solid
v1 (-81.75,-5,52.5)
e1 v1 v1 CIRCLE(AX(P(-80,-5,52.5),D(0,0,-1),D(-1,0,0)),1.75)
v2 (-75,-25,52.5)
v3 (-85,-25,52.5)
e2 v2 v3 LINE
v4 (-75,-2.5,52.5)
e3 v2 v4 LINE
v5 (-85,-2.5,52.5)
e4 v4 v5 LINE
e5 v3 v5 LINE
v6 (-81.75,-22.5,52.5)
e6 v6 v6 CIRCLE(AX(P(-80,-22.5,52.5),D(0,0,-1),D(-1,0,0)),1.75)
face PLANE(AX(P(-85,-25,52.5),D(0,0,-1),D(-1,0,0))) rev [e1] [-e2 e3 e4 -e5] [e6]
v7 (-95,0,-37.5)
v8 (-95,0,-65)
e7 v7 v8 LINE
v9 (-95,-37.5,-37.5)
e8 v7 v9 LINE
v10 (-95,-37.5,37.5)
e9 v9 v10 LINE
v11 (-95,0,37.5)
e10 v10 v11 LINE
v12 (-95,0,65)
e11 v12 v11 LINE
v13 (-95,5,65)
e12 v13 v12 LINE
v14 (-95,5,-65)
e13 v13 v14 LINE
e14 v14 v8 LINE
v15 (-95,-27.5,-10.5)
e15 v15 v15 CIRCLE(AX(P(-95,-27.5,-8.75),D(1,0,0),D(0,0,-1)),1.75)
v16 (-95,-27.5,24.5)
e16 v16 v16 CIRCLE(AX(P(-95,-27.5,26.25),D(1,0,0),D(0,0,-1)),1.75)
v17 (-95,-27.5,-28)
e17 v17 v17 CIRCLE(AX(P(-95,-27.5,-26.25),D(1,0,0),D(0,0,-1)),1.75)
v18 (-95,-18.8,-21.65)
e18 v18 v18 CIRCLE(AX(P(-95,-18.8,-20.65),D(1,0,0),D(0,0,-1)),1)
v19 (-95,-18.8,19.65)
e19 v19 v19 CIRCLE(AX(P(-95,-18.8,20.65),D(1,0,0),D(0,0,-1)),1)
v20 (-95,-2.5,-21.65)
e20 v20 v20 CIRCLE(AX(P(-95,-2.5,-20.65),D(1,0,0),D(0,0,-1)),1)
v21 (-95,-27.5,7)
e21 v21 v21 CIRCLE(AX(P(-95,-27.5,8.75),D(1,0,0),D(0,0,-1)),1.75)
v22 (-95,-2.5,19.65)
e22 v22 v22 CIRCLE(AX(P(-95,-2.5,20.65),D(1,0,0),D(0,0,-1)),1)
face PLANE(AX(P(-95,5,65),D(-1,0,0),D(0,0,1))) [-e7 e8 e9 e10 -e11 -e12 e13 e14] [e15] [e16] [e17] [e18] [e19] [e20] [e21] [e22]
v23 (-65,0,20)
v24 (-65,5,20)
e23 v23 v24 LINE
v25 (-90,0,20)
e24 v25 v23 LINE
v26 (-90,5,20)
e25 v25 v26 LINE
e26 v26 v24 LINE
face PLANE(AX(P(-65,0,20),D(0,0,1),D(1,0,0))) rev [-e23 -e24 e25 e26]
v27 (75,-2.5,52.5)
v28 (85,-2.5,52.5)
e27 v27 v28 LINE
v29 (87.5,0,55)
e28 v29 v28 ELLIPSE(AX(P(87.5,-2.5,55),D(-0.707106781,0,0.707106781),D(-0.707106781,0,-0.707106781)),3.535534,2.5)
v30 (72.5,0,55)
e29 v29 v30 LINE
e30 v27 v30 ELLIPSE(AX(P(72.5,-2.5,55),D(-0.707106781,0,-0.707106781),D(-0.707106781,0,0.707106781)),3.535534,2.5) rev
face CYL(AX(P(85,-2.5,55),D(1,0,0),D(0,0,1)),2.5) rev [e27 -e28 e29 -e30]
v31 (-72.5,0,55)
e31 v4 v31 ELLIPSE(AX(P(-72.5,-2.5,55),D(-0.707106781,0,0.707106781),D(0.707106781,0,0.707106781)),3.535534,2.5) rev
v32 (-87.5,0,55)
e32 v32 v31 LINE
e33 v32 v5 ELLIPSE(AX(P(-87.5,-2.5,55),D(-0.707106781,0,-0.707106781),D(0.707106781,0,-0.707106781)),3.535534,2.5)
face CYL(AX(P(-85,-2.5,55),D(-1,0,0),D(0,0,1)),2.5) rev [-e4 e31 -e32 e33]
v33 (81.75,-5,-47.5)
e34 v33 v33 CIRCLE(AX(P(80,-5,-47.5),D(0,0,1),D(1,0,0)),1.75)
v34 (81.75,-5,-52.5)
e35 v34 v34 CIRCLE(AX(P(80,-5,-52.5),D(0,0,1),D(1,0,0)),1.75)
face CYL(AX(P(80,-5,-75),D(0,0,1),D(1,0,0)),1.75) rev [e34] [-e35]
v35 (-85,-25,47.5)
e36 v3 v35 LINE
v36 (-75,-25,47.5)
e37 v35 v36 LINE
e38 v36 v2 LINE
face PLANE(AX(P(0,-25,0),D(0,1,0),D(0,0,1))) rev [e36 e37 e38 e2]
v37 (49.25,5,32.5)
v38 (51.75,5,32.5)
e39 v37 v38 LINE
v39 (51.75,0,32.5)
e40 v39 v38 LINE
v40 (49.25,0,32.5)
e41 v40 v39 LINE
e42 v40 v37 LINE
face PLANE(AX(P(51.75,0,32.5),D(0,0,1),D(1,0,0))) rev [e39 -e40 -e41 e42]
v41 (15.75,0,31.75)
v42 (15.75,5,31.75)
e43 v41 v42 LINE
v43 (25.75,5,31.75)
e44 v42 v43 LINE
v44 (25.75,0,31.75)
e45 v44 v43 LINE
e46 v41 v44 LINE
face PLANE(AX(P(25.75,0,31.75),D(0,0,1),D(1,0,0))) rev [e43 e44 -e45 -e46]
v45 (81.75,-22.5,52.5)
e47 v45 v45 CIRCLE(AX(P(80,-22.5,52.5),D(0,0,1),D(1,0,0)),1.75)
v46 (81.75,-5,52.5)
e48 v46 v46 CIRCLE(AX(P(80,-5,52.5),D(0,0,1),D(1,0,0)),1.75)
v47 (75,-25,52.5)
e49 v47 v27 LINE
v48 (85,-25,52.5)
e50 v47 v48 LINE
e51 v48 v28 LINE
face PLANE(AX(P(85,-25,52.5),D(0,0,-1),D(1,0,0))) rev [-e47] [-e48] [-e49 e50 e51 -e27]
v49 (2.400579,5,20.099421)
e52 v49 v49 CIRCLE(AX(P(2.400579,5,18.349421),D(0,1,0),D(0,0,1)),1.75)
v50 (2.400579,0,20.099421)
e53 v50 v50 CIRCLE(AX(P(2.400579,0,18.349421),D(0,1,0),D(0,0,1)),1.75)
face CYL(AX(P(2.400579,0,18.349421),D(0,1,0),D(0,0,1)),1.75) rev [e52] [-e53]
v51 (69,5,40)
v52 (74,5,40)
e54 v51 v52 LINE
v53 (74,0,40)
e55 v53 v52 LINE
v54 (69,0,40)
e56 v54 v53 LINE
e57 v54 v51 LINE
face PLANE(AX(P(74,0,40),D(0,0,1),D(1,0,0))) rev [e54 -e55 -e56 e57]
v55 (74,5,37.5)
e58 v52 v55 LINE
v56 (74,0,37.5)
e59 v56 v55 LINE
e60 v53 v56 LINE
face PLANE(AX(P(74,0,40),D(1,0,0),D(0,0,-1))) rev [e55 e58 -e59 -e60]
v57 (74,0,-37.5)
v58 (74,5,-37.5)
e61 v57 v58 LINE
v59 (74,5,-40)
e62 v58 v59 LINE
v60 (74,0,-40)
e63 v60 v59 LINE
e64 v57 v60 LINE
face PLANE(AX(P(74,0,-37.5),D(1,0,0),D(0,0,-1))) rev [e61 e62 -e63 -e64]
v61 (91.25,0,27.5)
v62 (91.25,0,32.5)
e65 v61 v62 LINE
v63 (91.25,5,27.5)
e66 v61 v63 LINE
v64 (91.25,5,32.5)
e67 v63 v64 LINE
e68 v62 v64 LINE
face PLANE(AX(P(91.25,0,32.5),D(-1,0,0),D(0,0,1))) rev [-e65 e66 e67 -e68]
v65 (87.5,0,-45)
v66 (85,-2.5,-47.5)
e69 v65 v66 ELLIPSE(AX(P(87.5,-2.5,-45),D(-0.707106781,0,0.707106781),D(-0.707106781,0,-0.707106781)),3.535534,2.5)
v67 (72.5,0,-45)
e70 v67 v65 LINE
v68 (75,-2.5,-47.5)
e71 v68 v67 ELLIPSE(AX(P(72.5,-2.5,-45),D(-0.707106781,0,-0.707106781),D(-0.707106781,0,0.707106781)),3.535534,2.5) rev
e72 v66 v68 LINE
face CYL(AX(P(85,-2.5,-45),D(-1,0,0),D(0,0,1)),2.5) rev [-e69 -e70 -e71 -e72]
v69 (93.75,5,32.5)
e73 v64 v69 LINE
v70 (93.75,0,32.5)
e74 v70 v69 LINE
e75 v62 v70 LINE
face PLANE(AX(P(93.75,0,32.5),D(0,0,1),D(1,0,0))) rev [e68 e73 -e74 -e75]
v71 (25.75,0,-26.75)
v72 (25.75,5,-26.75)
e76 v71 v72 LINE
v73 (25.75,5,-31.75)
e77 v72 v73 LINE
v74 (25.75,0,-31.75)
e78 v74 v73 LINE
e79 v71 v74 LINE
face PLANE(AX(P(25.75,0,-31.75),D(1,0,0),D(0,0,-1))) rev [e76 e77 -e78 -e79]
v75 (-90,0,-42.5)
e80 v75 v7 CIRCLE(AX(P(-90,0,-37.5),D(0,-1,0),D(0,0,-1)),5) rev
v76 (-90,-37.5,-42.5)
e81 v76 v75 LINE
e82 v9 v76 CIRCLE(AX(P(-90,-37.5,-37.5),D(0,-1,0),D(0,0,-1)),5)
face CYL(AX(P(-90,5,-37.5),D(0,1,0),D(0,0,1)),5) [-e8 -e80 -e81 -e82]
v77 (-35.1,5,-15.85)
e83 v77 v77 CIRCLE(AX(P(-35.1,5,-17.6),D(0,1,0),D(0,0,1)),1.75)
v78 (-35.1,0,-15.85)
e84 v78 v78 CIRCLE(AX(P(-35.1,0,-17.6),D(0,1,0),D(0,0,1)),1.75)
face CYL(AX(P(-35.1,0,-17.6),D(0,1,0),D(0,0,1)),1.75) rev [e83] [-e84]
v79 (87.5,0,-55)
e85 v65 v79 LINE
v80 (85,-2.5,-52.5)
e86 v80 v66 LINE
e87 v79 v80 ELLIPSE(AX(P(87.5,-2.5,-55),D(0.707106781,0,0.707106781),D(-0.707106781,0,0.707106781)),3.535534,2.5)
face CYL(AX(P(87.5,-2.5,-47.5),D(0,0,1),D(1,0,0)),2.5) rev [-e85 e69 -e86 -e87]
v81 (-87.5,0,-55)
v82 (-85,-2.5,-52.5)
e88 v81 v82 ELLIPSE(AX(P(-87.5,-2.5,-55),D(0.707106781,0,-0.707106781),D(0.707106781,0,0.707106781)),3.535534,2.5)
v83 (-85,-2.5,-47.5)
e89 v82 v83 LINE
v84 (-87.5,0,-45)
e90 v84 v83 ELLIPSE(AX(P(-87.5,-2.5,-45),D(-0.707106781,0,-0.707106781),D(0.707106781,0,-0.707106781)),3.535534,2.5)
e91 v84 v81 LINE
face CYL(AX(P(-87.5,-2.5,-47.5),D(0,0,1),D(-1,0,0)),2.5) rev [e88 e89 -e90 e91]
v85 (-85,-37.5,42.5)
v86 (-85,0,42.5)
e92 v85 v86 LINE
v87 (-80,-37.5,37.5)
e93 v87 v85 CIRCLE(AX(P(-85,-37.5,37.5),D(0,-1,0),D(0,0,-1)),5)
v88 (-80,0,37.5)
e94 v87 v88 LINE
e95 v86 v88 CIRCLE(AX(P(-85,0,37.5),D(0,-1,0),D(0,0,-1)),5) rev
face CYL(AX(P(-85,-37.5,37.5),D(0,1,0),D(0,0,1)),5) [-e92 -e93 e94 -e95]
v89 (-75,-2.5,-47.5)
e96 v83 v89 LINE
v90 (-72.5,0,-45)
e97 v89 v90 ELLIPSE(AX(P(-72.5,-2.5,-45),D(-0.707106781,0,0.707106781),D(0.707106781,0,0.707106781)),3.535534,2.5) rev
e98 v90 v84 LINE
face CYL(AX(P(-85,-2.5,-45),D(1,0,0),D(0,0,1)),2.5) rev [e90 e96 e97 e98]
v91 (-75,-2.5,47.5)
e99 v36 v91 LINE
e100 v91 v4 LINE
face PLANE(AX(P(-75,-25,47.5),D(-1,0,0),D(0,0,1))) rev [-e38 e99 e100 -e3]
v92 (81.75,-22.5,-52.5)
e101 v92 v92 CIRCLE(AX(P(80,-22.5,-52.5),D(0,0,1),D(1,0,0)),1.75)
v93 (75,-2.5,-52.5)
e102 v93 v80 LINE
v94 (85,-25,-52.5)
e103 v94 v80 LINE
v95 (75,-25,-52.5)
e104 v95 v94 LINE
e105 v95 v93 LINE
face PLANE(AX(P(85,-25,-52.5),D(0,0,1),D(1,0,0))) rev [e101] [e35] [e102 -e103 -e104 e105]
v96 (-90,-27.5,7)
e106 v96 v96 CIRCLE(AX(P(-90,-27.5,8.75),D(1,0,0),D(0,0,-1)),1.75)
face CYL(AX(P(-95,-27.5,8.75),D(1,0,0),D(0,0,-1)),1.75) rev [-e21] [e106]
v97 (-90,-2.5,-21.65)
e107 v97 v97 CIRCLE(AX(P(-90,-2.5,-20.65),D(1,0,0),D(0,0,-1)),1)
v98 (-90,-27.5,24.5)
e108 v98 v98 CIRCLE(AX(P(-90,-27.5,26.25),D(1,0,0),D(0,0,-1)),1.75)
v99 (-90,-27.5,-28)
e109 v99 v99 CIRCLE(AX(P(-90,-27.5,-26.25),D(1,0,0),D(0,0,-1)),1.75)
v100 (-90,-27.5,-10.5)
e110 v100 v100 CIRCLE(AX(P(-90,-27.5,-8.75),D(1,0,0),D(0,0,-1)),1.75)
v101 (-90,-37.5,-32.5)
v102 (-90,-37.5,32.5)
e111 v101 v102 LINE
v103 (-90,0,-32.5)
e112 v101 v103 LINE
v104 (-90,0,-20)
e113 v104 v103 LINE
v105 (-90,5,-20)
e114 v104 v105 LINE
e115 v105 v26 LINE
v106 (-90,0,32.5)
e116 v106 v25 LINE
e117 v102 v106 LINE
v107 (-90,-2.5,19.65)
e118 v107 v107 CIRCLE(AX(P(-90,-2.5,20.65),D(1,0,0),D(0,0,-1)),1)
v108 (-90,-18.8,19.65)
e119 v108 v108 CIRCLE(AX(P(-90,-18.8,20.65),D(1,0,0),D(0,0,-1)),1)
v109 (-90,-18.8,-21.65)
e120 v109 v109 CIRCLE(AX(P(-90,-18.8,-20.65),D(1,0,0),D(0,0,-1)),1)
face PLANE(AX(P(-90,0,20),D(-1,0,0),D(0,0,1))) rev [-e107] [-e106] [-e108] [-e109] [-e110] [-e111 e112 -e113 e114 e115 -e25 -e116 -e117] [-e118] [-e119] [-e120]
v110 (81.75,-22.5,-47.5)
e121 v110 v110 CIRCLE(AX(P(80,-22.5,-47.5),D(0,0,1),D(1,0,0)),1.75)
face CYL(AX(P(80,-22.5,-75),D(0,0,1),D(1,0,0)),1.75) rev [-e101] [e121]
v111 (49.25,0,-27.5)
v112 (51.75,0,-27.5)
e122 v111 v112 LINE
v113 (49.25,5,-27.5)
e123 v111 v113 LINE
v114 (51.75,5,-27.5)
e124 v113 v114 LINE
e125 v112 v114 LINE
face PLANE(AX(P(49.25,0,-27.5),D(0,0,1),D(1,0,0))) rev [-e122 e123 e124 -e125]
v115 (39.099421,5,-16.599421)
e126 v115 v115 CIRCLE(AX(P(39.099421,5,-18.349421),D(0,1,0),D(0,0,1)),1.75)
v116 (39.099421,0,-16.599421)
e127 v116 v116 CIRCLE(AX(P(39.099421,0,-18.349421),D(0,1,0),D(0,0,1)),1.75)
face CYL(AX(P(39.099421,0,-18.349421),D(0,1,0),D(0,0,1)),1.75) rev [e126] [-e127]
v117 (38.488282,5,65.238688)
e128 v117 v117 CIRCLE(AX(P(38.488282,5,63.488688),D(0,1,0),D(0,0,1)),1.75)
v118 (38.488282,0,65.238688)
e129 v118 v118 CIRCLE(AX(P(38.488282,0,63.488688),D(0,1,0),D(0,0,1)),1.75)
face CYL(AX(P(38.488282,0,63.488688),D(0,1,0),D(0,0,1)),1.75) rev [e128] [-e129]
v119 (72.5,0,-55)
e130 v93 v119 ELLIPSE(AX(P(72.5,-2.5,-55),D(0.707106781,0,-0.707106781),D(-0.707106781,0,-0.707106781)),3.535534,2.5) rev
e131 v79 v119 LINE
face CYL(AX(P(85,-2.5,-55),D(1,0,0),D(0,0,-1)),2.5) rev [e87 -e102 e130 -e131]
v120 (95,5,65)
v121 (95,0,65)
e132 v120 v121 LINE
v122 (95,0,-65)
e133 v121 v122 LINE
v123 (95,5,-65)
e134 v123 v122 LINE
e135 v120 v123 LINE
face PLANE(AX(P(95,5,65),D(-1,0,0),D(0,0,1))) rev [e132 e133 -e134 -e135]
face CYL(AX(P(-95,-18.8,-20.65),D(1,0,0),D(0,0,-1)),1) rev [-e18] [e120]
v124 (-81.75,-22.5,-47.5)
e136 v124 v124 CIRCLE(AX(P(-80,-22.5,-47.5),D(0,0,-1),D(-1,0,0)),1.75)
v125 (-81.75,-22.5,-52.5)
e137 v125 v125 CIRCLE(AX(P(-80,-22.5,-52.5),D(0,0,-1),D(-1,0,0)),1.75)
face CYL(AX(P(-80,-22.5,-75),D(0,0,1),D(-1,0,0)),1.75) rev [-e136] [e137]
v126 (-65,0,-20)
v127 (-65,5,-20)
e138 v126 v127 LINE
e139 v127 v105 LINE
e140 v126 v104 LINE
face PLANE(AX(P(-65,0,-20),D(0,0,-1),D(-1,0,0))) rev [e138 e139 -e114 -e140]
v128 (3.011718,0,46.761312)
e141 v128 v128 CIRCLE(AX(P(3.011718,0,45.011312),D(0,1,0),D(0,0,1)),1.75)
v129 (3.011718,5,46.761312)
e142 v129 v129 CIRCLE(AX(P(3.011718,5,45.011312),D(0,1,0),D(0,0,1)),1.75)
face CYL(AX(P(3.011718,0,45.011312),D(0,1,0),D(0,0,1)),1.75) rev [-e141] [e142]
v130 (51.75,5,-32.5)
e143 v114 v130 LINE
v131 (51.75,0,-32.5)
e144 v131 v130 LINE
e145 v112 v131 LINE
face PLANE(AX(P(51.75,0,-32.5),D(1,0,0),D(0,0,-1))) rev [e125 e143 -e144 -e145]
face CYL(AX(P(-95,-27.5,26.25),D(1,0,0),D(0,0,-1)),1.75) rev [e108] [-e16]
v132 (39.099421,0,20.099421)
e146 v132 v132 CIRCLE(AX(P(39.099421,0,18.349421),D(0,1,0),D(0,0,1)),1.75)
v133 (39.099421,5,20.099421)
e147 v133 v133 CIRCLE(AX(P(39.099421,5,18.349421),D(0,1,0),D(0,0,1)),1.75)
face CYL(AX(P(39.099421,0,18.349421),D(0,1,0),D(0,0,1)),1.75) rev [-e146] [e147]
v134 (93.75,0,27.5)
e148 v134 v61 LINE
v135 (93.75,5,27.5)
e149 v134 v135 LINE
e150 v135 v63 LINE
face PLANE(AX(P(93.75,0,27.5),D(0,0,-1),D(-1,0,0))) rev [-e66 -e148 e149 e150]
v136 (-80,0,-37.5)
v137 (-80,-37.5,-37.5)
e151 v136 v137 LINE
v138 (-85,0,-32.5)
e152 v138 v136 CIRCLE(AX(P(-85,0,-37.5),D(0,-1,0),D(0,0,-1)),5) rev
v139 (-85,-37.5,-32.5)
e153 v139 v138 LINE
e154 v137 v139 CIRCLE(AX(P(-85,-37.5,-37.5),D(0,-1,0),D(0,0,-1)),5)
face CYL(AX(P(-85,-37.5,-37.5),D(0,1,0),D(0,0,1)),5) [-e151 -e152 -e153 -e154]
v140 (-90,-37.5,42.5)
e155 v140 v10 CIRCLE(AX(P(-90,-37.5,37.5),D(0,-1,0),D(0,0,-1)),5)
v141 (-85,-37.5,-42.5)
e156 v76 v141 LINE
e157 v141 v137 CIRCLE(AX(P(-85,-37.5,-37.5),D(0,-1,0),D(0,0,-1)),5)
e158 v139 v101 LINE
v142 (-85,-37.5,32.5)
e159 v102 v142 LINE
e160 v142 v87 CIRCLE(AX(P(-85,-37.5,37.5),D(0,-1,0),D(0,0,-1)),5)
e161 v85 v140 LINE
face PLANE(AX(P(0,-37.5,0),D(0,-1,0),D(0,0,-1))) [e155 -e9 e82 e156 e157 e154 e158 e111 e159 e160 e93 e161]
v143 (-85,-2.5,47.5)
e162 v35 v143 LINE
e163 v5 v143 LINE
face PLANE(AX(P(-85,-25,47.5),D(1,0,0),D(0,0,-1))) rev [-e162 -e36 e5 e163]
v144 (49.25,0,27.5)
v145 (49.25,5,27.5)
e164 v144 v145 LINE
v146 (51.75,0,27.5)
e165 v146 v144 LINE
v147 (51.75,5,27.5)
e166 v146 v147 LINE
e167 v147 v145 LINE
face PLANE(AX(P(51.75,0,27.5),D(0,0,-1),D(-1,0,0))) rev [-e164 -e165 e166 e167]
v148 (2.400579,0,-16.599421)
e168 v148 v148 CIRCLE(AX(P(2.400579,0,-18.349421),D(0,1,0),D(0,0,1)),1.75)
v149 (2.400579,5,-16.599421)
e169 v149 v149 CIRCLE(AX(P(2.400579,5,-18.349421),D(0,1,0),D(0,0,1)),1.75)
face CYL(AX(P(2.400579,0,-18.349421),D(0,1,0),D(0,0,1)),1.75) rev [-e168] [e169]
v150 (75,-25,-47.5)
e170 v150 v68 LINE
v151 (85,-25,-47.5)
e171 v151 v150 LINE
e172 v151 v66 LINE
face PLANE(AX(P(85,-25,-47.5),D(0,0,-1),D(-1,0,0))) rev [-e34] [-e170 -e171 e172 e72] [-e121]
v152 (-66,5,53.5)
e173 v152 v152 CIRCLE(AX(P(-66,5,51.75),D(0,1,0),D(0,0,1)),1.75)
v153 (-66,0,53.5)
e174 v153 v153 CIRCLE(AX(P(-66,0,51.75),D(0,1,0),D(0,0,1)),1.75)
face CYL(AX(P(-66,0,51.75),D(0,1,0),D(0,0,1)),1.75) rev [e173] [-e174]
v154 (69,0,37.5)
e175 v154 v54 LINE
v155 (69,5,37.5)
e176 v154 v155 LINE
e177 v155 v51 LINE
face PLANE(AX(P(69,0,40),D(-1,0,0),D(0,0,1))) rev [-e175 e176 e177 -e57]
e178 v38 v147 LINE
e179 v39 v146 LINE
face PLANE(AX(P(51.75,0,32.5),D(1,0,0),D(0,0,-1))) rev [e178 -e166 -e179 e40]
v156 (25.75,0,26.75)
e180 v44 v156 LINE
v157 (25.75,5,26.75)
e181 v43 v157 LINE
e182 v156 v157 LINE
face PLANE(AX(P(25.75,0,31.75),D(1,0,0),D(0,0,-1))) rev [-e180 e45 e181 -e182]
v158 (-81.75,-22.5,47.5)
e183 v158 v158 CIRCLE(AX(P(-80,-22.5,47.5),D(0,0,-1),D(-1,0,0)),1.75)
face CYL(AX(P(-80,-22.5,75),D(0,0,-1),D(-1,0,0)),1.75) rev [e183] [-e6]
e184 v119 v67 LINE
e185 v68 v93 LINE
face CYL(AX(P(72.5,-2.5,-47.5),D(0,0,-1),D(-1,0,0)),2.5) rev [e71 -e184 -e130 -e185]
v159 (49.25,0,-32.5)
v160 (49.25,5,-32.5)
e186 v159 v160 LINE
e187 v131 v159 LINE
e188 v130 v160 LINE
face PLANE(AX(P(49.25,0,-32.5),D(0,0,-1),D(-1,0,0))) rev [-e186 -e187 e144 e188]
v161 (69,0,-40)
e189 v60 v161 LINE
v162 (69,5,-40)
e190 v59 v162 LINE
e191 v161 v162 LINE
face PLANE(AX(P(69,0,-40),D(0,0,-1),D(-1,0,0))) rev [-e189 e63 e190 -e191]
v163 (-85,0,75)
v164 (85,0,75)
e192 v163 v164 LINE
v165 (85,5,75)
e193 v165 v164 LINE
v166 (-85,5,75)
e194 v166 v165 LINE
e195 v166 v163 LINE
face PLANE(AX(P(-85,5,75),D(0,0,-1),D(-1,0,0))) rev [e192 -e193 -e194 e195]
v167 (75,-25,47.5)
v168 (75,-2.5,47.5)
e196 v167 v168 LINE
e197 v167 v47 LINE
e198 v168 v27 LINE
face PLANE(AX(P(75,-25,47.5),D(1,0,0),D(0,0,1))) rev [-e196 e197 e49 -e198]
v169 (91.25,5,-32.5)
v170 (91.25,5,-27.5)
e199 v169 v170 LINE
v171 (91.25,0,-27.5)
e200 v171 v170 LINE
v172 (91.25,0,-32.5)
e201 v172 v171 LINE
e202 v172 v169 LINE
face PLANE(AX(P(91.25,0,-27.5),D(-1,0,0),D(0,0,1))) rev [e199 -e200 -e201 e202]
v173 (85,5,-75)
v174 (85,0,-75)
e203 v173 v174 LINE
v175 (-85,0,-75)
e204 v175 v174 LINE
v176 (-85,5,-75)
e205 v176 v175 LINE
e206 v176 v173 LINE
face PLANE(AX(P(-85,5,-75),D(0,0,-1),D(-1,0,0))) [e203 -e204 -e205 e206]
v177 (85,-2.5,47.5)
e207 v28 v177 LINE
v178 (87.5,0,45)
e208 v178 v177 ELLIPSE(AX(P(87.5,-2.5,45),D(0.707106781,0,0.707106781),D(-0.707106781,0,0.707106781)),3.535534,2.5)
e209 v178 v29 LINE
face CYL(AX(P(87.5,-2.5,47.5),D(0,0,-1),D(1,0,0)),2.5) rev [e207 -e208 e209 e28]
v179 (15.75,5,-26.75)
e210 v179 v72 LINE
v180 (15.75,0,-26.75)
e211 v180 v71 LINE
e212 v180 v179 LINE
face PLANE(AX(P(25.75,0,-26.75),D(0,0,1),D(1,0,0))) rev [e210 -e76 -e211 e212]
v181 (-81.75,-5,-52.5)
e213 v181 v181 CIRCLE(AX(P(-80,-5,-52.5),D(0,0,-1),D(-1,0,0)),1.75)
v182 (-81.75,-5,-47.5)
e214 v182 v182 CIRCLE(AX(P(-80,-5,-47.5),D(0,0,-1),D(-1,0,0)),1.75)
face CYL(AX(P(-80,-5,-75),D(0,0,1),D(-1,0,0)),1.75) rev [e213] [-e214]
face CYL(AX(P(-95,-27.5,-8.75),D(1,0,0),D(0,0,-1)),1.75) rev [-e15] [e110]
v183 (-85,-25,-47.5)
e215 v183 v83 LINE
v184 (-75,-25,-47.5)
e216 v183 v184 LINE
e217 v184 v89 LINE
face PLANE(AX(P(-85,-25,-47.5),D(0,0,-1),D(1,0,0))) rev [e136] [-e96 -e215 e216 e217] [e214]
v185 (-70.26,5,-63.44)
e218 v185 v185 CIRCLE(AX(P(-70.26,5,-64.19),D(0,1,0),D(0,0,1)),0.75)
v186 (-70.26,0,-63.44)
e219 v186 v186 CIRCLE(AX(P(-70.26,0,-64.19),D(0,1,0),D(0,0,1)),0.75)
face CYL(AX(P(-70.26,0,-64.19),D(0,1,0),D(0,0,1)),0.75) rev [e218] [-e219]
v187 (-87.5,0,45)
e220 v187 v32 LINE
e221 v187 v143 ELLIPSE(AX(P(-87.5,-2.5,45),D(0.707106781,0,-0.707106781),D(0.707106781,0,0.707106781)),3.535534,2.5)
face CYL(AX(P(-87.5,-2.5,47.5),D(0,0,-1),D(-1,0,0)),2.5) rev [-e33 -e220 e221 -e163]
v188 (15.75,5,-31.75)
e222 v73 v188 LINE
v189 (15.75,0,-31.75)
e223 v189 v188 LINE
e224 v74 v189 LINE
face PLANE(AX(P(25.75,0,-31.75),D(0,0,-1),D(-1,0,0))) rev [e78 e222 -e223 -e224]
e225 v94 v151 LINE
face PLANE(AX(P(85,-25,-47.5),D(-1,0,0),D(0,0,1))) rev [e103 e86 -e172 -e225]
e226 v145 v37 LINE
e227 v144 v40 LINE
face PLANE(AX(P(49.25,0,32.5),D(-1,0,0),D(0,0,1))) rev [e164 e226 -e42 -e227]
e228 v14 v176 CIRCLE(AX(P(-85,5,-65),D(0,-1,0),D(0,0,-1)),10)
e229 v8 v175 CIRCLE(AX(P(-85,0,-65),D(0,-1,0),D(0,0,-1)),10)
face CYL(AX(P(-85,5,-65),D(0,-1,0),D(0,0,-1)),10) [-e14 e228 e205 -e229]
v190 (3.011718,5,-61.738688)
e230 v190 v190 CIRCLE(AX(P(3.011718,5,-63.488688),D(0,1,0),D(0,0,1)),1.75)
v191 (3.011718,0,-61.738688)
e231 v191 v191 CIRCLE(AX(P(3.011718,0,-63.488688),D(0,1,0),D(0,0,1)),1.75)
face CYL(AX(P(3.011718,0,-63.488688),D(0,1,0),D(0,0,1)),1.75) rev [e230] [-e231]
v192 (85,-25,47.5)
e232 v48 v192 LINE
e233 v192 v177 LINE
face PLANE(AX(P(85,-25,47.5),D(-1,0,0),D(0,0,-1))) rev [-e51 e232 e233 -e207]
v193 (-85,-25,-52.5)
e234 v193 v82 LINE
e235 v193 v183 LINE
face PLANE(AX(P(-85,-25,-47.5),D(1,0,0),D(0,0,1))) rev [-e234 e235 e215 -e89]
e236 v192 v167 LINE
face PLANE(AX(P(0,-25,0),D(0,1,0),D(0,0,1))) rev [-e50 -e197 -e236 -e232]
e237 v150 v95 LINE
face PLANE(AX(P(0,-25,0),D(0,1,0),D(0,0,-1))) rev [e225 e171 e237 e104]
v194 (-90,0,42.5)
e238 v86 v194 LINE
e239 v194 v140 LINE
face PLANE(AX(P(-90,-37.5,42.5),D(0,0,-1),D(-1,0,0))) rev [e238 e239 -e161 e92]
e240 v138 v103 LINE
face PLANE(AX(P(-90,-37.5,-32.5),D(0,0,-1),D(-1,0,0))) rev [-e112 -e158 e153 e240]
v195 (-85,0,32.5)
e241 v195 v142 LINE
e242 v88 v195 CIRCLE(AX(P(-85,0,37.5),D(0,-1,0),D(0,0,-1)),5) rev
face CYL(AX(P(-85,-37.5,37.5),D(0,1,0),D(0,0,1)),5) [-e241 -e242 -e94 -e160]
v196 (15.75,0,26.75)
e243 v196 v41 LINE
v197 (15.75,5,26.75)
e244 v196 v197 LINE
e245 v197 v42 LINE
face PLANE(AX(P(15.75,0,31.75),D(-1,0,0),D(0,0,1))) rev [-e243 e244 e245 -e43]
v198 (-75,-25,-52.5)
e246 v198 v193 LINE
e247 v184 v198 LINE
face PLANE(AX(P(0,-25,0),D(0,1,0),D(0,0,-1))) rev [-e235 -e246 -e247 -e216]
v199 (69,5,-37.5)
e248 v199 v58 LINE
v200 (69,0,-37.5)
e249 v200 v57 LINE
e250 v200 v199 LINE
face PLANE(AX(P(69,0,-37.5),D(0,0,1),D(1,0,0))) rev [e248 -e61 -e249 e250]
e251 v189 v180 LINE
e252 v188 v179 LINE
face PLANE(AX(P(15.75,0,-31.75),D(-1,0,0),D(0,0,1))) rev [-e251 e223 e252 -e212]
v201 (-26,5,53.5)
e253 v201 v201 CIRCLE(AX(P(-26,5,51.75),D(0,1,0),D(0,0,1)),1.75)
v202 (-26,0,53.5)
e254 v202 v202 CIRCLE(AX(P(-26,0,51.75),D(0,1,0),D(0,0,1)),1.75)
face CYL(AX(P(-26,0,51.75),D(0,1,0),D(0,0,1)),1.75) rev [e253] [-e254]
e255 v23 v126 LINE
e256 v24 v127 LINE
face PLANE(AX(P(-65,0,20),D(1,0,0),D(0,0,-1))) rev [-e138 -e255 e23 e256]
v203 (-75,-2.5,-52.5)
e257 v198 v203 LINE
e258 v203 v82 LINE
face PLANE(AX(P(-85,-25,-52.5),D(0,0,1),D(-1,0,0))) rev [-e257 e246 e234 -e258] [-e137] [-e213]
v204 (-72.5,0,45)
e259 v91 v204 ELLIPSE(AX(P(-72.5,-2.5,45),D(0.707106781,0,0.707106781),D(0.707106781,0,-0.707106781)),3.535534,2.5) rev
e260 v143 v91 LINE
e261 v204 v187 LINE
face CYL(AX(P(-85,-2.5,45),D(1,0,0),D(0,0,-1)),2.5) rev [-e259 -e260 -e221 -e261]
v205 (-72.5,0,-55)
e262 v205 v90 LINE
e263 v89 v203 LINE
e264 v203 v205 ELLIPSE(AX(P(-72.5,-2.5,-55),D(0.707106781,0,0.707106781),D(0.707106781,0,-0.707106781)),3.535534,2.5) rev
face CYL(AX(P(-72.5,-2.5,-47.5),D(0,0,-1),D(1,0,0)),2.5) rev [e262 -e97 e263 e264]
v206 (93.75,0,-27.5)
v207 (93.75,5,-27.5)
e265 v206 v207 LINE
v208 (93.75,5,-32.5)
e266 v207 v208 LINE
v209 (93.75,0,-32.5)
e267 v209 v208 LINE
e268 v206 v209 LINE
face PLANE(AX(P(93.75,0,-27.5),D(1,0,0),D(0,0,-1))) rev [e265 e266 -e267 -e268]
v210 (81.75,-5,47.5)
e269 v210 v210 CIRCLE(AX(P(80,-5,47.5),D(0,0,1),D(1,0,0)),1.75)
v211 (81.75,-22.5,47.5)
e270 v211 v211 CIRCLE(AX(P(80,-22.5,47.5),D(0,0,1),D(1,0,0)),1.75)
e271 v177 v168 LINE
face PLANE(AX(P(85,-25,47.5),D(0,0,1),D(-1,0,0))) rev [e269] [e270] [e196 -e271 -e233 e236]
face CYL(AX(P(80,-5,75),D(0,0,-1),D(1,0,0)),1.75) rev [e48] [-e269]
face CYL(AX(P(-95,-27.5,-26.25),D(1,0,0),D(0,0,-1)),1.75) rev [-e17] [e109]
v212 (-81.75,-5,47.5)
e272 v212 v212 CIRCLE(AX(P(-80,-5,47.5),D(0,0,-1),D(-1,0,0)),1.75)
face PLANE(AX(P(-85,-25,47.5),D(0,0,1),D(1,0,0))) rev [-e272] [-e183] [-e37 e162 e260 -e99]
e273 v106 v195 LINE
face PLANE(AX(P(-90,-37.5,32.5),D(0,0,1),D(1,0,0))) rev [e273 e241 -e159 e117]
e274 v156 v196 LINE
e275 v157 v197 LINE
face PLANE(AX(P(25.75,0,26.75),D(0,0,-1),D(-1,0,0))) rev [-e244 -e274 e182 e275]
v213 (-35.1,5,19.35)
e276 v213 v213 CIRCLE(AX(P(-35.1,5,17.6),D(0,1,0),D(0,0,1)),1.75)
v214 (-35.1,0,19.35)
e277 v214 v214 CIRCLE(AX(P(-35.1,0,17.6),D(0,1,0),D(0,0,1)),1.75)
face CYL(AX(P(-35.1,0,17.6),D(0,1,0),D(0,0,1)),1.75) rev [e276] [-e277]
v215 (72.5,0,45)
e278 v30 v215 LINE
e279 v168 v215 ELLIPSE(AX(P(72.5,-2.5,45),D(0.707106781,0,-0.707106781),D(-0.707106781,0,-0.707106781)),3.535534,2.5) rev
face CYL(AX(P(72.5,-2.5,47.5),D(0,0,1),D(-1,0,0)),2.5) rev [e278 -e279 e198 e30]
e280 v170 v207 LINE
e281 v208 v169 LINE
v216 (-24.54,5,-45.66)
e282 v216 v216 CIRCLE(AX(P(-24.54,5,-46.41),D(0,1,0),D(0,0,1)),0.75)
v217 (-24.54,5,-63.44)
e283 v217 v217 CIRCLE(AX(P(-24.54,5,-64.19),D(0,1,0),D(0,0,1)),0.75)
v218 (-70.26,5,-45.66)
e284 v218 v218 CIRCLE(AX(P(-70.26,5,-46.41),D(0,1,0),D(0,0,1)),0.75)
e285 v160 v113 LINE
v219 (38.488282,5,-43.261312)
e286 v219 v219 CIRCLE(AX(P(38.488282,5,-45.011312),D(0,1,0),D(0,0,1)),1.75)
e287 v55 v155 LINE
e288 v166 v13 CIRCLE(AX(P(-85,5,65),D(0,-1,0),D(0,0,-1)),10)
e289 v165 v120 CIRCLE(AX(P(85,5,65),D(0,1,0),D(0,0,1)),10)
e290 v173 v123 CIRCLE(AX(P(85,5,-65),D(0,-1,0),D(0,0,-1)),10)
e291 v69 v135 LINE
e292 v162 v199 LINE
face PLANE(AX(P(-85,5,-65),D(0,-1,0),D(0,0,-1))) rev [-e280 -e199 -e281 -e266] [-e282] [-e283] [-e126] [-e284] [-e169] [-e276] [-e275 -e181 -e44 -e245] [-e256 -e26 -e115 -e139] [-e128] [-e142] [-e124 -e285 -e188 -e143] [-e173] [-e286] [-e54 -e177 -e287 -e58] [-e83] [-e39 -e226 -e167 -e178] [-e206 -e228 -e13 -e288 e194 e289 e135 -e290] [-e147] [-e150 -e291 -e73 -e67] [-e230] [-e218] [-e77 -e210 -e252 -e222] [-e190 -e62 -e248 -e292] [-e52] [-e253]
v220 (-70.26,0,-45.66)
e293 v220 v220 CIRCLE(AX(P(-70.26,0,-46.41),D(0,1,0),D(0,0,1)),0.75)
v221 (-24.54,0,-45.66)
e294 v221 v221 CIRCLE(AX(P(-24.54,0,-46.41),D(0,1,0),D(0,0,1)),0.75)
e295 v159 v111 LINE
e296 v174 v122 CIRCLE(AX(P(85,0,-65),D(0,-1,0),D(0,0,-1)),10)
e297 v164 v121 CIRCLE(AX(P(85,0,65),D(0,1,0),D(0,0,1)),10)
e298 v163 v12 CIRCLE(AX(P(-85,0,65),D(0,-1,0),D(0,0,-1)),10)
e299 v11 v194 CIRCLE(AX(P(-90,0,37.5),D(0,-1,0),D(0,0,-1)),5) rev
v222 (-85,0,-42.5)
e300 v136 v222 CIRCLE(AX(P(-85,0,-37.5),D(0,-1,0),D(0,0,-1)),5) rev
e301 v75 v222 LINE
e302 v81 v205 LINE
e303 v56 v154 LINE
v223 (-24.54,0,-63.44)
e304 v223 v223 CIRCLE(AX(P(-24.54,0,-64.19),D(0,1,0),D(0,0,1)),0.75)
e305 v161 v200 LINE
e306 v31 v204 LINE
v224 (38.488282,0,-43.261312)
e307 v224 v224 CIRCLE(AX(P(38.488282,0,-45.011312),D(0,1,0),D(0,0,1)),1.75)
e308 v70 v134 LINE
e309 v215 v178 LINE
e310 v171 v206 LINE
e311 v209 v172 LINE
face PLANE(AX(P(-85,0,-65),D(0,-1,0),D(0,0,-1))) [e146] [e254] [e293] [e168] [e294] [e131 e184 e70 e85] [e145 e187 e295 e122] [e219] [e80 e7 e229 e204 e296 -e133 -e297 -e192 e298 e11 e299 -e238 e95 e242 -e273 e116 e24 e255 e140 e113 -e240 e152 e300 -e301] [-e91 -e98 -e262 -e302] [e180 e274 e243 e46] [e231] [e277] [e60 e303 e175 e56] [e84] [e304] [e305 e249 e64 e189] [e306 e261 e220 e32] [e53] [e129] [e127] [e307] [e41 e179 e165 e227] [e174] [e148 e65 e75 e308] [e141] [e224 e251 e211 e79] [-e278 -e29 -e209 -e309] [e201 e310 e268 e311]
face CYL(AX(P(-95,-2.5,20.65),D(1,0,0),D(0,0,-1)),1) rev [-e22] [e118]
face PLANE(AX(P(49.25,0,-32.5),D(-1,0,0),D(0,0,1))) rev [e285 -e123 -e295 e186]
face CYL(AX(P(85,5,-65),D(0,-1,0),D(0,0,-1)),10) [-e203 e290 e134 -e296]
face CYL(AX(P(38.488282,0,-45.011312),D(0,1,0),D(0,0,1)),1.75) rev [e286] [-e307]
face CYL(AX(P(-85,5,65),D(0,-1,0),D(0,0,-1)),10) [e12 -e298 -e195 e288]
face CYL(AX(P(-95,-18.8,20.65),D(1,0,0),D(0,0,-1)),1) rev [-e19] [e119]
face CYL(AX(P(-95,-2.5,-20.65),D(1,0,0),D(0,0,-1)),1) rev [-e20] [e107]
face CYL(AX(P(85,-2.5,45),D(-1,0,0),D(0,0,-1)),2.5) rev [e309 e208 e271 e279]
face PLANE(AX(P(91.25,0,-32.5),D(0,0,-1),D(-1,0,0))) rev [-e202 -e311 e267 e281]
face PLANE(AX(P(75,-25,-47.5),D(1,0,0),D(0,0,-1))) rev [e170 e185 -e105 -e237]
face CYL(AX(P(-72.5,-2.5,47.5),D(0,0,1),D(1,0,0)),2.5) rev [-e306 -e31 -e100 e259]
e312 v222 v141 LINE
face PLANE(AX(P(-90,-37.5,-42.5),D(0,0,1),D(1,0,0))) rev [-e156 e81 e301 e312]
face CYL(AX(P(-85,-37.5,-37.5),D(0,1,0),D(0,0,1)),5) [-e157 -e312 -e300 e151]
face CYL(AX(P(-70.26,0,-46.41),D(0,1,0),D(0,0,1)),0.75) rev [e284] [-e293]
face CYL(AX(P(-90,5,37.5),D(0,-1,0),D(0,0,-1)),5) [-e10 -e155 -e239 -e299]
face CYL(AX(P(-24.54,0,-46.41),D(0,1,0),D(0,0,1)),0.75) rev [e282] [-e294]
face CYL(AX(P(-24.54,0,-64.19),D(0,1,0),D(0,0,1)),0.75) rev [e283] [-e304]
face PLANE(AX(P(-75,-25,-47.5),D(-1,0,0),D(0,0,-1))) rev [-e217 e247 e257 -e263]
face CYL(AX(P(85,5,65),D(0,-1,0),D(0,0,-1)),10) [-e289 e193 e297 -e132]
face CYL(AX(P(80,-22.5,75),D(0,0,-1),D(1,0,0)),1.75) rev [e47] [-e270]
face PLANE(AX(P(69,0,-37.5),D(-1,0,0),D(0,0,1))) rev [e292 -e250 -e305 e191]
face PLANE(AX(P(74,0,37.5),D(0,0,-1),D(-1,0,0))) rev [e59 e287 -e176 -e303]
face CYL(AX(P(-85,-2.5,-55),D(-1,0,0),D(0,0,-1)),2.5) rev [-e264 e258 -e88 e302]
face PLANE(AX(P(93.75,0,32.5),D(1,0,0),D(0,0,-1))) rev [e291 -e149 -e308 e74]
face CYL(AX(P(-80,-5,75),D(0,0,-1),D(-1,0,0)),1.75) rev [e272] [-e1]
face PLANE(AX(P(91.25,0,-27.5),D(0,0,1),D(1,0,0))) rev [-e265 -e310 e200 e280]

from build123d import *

# Parameters (mm, degrees)
BOSS_EXTRUDE1_DEPTH = 5
SKETCH2_R           = 1.75
SKETCH2_R_2         = 0.75
SKETCH2_W           = 10
SKETCH2_H           = 5
SKETCH2_W_2         = 2.5
SKETCH2_W_3         = 25
SKETCH2_H_2         = 40
SKETCH2_W_4         = 5
SKETCH2_H_3         = 2.5
CUT_EXTRUDE1_DEPTH  = 122.140414396
SKETCH6_W           = 10
SKETCH6_H           = 5
BOSS_EXTRUDE3_DEPTH = 25
SKETCH7_R           = 1.75
CUT_EXTRUDE3_DEPTH  = 158.023087474
FILLET1_R           = 2.5
MIRROR2_START       = -55
MIRROR2_OUTLINE_R   = 1.75
MIRROR2_DEPTH       = 10
MIRROR2_START_2     = 45
MIRROR2_2_OUTLINE_R = 1.75
MIRROR2_2_DEPTH     = 10
MIRROR2_START_3     = -87.5
MIRROR2_3_DEPTH     = 175.5
SKETCH8_W           = 10
SKETCH8_H           = 10
BOSS_EXTRUDE4_DEPTH = 37.5
SKETCH9_W           = 85
SKETCH9_H           = 37.5
BOSS_EXTRUDE8_DEPTH = 5
SKETCH10_R          = 1.75
SKETCH10_R_2        = 1
CUT_EXTRUDE4_DEPTH  = 204.116345969
FILLET2_R           = 5


with BuildPart() as part:
    # Sketch1 → Boss-Extrude1 (new body)
    with BuildSketch(Plane(origin=(0, 0, 0), x_dir=(1, 0, 0), z_dir=(0, 1, 0))):
        with BuildLine():
            Line((-85, -75), (85, -75))
            ThreePointArc((85, -75), (92.071067812, -72.071067812), (95, -65))
            Line((95, -65), (95, 65))
            ThreePointArc((95, 65), (92.071067812, 72.071067812), (85, 75))
            Line((85, 75), (-85, 75))
            ThreePointArc((-85, 75), (-92.071067812, 72.071067812), (-95, 65))
            Line((-95, 65), (-95, -65))
            ThreePointArc((-95, -65), (-92.071067812, -72.071067812), (-85, -75))
        make_face()
    extrude(amount=BOSS_EXTRUDE1_DEPTH)

    # Sketch2 → Cut-Extrude1 (cut, through all)
    with BuildSketch(Plane(origin=(0, 5, 0), x_dir=(1, 0, 0), z_dir=(0, 1, 0))):
        with Locations(Location((-66, -51.75, 0), (0, 0, 270))):
            Circle(SKETCH2_R)
        with Locations(Location((-26, -51.75, 0), (0, 0, 270))):
            Circle(SKETCH2_R)
        with Locations(Location((-35.1, 17.6, 0), (0, 0, 270))):
            Circle(SKETCH2_R)
        with Locations(Location((-35.1, -17.6, 0), (0, 0, 270))):
            Circle(SKETCH2_R)
        with Locations(Location((2.400579028, 18.349420972, 0), (0, 0, 270))):
            Circle(SKETCH2_R)
        with Locations(Location((39.099420972, 18.349420972, 0), (0, 0, 270))):
            Circle(SKETCH2_R)
        with Locations(Location((39.099420972, -18.349420972, 0), (0, 0, 270))):
            Circle(SKETCH2_R)
        with Locations(Location((2.400579028, -18.349420972, 0), (0, 0, 270))):
            Circle(SKETCH2_R)
        with Locations(Location((3.011718317, -45.011311623, 0), (0, 0, 270))):
            Circle(SKETCH2_R)
        with Locations(Location((38.488281683, -63.488688377, 0), (0, 0, 270))):
            Circle(SKETCH2_R)
        with Locations(Location((38.488281683, 45.011311623, 0), (0, 0, 270))):
            Circle(SKETCH2_R)
        with Locations(Location((3.011718317, 63.488688377, 0), (0, 0, 270))):
            Circle(SKETCH2_R)
        with Locations(Location((-70.26, 64.19, 0), (0, 0, 270))):
            Circle(SKETCH2_R_2)
        with Locations(Location((-70.26, 46.41, 0), (0, 0, 270))):
            Circle(SKETCH2_R_2)
        with Locations(Location((-24.54, 64.19, 0), (0, 0, 270))):
            Circle(SKETCH2_R_2)
        with Locations(Location((-24.54, 46.41, 0), (0, 0, 270))):
            Circle(SKETCH2_R_2)
        with Locations((20.75, -29.25)):
            Rectangle(SKETCH2_W, SKETCH2_H)
        with Locations((50.5, 30)):
            Rectangle(SKETCH2_W_2, SKETCH2_H)
        with Locations((50.5, -30)):
            Rectangle(SKETCH2_W_2, SKETCH2_H)
        with Locations((92.5, -30)):
            Rectangle(SKETCH2_W_2, SKETCH2_H)
        with Locations((92.5, 30)):
            Rectangle(SKETCH2_W_2, SKETCH2_H)
        with Locations((-77.5, 0)):
            Rectangle(SKETCH2_W_3, SKETCH2_H_2)
        with Locations((20.75, 29.25)):
            Rectangle(SKETCH2_W, SKETCH2_H)
        with Locations((71.5, -38.75)):
            Rectangle(SKETCH2_W_4, SKETCH2_H_3)
        with Locations((71.5, 38.75)):
            Rectangle(SKETCH2_W_4, SKETCH2_H_3)
    extrude(amount=-CUT_EXTRUDE1_DEPTH, mode=Mode.SUBTRACT)

    # Sketch6 → Boss-Extrude3 (add)
    with BuildSketch(Plane.XZ):
        with Locations((-80, 50)):
            Rectangle(SKETCH6_W, SKETCH6_H)
    extrude(amount=BOSS_EXTRUDE3_DEPTH)

    # Sketch7 → Cut-Extrude3 (cut, through all)
    with BuildSketch(Plane(origin=(0, 0, 47.5), x_dir=(-1, 0, 0), z_dir=(0, 0, -1))):
        with Locations((80, -22.5)):
            Circle(SKETCH7_R)
        with Locations((80, -5)):
            Circle(SKETCH7_R)
    extrude(amount=-CUT_EXTRUDE3_DEPTH, mode=Mode.SUBTRACT)

    # Fillet1
    fillet1_edges = [part.edges().sort_by_distance(p)[0] for p in [
        (-75, 0, 50),
        (-80, 0, 52.5),
        (-85, 0, 50),
        (-80, 0, 47.5),
    ]]
    fillet(fillet1_edges, radius=FILLET1_R)

    # Mirror2: read off the stored shape, not the designer's step
    # Mirror2 outline → Mirror2 (add)
    # profile 1 of 2: a face of its own
    with BuildSketch(Plane.XY.offset(MIRROR2_START)):
        with BuildLine():
            Line((87.5, 0), (72.5, 0))
            ThreePointArc((72.5, 0), (74.267766953, -0.732233047), (75, -2.5))
            Line((75, -2.5), (75, -25))
            Line((75, -25), (85, -25))
            Line((85, -25), (85, -2.5))
            ThreePointArc((85, -2.5), (85.732233047, -0.732233047), (87.5, 0))
        make_face()
        with Locations((80, -22.5)):
            Circle(MIRROR2_OUTLINE_R, mode=Mode.SUBTRACT)
        with Locations((80, -5)):
            Circle(MIRROR2_OUTLINE_R, mode=Mode.SUBTRACT)
    # profile 2 of 2: a face of its own
    with BuildSketch(Plane.XY.offset(MIRROR2_START)):
        with BuildLine():
            Line((-75, -25), (-75, -2.5))
            ThreePointArc((-75, -2.5), (-74.267766953, -0.732233047), (-72.5, 0))
            Line((-72.5, 0), (-87.5, 0))
            ThreePointArc((-87.5, 0), (-85.732233047, -0.732233047), (-85, -2.5))
            Line((-85, -2.5), (-85, -25))
            Line((-85, -25), (-75, -25))
        make_face()
        with Locations((-80, -22.5)):
            Circle(MIRROR2_OUTLINE_R, mode=Mode.SUBTRACT)
        with Locations((-80, -5)):
            Circle(MIRROR2_OUTLINE_R, mode=Mode.SUBTRACT)
    extrude(amount=MIRROR2_DEPTH)

    # Mirror2 2 outline → Mirror2 2 (add)
    with BuildSketch(Plane.XY.offset(MIRROR2_START_2)):
        with BuildLine():
            Line((87.5, 0), (72.5, 0))
            ThreePointArc((72.5, 0), (74.267766953, -0.732233047), (75, -2.5))
            Line((75, -2.5), (75, -25))
            Line((75, -25), (85, -25))
            Line((85, -25), (85, -2.5))
            ThreePointArc((85, -2.5), (85.732233047, -0.732233047), (87.5, 0))
        make_face()
        with Locations((80, -22.5)):
            Circle(MIRROR2_2_OUTLINE_R, mode=Mode.SUBTRACT)
        with Locations((80, -5)):
            Circle(MIRROR2_2_OUTLINE_R, mode=Mode.SUBTRACT)
    extrude(amount=MIRROR2_2_DEPTH)

    # Mirror2 3 outline → Mirror2 3 (cut)
    with BuildSketch(Plane.YZ.offset(MIRROR2_START_3)):
        with BuildLine():
            Line((-25, 55), (-25, 52.5))
            Line((-25, 52.5), (-2.5, 52.5))
            ThreePointArc((-2.5, 52.5), (-0.732233047, 53.232233047), (0, 55))
            Line((0, 55), (-25, 55))
        make_face()
        with BuildLine():
            Line((-2.5, 47.5), (-25, 47.5))
            Line((-25, 47.5), (-25, 45))
            Line((-25, 45), (0, 45))
            ThreePointArc((0, 45), (-0.732233047, 46.767766953), (-2.5, 47.5))
        make_face()
        with BuildLine():
            Line((-25, -47.5), (-2.5, -47.5))
            ThreePointArc((-2.5, -47.5), (-0.732233047, -46.767766953), (0, -45))
            Line((0, -45), (-25, -45))
            Line((-25, -45), (-25, -47.5))
        make_face()
        with BuildLine():
            Line((-2.5, -52.5), (-25, -52.5))
            Line((-25, -52.5), (-25, -55))
            Line((-25, -55), (0, -55))
            ThreePointArc((0, -55), (-0.732233047, -53.232233047), (-2.5, -52.5))
        make_face()
    extrude(amount=MIRROR2_3_DEPTH, mode=Mode.SUBTRACT)

    # Sketch8 → Boss-Extrude4 (add)
    with BuildSketch(Plane.XZ):
        with Locations((-85, 37.5)):
            Rectangle(SKETCH8_W, SKETCH8_H)
        with Locations((-85, -37.5)):
            Rectangle(SKETCH8_W, SKETCH8_H)
    extrude(amount=BOSS_EXTRUDE4_DEPTH)

    # Sketch9 → Boss-Extrude8 (add)
    with BuildSketch(Plane.ZY.offset(90)):
        with Locations((0, -18.75)):
            Rectangle(SKETCH9_W, SKETCH9_H)
    extrude(amount=BOSS_EXTRUDE8_DEPTH)

    # Sketch10 → Cut-Extrude4 (cut, through all)
    with BuildSketch(Plane(origin=(-90, 0, 0), x_dir=(0, 0, -1), z_dir=(1, 0, 0))):
        with Locations((-26.25, -27.5)):
            Circle(SKETCH10_R)
        with Locations((-8.75, -27.5)):
            Circle(SKETCH10_R)
        with Locations((8.75, -27.5)):
            Circle(SKETCH10_R)
        with Locations((26.25, -27.5)):
            Circle(SKETCH10_R)
        with Locations((-20.65, -2.5)):
            Circle(SKETCH10_R_2)
        with Locations((-20.65, -18.8)):
            Circle(SKETCH10_R_2)
        with Locations((20.65, -2.5)):
            Circle(SKETCH10_R_2)
        with Locations((20.65, -18.8)):
            Circle(SKETCH10_R_2)
    extrude(amount=-CUT_EXTRUDE4_DEPTH, mode=Mode.SUBTRACT)

    # Fillet2
    fillet2_edges = [part.edges().sort_by_distance(p)[0] for p in [
        (-80, -18.75, -42.5),
        (-80, -18.75, -32.5),
        (-95, -18.75, -42.5),
        (-95, -18.75, 42.5),
        (-80, -18.75, 42.5),
        (-80, -18.75, 32.5),
    ]]
    fillet(fillet2_edges, radius=FILLET2_R - 0.0001)  # a hair under: the kernel refuses the full size


solid = part.part
